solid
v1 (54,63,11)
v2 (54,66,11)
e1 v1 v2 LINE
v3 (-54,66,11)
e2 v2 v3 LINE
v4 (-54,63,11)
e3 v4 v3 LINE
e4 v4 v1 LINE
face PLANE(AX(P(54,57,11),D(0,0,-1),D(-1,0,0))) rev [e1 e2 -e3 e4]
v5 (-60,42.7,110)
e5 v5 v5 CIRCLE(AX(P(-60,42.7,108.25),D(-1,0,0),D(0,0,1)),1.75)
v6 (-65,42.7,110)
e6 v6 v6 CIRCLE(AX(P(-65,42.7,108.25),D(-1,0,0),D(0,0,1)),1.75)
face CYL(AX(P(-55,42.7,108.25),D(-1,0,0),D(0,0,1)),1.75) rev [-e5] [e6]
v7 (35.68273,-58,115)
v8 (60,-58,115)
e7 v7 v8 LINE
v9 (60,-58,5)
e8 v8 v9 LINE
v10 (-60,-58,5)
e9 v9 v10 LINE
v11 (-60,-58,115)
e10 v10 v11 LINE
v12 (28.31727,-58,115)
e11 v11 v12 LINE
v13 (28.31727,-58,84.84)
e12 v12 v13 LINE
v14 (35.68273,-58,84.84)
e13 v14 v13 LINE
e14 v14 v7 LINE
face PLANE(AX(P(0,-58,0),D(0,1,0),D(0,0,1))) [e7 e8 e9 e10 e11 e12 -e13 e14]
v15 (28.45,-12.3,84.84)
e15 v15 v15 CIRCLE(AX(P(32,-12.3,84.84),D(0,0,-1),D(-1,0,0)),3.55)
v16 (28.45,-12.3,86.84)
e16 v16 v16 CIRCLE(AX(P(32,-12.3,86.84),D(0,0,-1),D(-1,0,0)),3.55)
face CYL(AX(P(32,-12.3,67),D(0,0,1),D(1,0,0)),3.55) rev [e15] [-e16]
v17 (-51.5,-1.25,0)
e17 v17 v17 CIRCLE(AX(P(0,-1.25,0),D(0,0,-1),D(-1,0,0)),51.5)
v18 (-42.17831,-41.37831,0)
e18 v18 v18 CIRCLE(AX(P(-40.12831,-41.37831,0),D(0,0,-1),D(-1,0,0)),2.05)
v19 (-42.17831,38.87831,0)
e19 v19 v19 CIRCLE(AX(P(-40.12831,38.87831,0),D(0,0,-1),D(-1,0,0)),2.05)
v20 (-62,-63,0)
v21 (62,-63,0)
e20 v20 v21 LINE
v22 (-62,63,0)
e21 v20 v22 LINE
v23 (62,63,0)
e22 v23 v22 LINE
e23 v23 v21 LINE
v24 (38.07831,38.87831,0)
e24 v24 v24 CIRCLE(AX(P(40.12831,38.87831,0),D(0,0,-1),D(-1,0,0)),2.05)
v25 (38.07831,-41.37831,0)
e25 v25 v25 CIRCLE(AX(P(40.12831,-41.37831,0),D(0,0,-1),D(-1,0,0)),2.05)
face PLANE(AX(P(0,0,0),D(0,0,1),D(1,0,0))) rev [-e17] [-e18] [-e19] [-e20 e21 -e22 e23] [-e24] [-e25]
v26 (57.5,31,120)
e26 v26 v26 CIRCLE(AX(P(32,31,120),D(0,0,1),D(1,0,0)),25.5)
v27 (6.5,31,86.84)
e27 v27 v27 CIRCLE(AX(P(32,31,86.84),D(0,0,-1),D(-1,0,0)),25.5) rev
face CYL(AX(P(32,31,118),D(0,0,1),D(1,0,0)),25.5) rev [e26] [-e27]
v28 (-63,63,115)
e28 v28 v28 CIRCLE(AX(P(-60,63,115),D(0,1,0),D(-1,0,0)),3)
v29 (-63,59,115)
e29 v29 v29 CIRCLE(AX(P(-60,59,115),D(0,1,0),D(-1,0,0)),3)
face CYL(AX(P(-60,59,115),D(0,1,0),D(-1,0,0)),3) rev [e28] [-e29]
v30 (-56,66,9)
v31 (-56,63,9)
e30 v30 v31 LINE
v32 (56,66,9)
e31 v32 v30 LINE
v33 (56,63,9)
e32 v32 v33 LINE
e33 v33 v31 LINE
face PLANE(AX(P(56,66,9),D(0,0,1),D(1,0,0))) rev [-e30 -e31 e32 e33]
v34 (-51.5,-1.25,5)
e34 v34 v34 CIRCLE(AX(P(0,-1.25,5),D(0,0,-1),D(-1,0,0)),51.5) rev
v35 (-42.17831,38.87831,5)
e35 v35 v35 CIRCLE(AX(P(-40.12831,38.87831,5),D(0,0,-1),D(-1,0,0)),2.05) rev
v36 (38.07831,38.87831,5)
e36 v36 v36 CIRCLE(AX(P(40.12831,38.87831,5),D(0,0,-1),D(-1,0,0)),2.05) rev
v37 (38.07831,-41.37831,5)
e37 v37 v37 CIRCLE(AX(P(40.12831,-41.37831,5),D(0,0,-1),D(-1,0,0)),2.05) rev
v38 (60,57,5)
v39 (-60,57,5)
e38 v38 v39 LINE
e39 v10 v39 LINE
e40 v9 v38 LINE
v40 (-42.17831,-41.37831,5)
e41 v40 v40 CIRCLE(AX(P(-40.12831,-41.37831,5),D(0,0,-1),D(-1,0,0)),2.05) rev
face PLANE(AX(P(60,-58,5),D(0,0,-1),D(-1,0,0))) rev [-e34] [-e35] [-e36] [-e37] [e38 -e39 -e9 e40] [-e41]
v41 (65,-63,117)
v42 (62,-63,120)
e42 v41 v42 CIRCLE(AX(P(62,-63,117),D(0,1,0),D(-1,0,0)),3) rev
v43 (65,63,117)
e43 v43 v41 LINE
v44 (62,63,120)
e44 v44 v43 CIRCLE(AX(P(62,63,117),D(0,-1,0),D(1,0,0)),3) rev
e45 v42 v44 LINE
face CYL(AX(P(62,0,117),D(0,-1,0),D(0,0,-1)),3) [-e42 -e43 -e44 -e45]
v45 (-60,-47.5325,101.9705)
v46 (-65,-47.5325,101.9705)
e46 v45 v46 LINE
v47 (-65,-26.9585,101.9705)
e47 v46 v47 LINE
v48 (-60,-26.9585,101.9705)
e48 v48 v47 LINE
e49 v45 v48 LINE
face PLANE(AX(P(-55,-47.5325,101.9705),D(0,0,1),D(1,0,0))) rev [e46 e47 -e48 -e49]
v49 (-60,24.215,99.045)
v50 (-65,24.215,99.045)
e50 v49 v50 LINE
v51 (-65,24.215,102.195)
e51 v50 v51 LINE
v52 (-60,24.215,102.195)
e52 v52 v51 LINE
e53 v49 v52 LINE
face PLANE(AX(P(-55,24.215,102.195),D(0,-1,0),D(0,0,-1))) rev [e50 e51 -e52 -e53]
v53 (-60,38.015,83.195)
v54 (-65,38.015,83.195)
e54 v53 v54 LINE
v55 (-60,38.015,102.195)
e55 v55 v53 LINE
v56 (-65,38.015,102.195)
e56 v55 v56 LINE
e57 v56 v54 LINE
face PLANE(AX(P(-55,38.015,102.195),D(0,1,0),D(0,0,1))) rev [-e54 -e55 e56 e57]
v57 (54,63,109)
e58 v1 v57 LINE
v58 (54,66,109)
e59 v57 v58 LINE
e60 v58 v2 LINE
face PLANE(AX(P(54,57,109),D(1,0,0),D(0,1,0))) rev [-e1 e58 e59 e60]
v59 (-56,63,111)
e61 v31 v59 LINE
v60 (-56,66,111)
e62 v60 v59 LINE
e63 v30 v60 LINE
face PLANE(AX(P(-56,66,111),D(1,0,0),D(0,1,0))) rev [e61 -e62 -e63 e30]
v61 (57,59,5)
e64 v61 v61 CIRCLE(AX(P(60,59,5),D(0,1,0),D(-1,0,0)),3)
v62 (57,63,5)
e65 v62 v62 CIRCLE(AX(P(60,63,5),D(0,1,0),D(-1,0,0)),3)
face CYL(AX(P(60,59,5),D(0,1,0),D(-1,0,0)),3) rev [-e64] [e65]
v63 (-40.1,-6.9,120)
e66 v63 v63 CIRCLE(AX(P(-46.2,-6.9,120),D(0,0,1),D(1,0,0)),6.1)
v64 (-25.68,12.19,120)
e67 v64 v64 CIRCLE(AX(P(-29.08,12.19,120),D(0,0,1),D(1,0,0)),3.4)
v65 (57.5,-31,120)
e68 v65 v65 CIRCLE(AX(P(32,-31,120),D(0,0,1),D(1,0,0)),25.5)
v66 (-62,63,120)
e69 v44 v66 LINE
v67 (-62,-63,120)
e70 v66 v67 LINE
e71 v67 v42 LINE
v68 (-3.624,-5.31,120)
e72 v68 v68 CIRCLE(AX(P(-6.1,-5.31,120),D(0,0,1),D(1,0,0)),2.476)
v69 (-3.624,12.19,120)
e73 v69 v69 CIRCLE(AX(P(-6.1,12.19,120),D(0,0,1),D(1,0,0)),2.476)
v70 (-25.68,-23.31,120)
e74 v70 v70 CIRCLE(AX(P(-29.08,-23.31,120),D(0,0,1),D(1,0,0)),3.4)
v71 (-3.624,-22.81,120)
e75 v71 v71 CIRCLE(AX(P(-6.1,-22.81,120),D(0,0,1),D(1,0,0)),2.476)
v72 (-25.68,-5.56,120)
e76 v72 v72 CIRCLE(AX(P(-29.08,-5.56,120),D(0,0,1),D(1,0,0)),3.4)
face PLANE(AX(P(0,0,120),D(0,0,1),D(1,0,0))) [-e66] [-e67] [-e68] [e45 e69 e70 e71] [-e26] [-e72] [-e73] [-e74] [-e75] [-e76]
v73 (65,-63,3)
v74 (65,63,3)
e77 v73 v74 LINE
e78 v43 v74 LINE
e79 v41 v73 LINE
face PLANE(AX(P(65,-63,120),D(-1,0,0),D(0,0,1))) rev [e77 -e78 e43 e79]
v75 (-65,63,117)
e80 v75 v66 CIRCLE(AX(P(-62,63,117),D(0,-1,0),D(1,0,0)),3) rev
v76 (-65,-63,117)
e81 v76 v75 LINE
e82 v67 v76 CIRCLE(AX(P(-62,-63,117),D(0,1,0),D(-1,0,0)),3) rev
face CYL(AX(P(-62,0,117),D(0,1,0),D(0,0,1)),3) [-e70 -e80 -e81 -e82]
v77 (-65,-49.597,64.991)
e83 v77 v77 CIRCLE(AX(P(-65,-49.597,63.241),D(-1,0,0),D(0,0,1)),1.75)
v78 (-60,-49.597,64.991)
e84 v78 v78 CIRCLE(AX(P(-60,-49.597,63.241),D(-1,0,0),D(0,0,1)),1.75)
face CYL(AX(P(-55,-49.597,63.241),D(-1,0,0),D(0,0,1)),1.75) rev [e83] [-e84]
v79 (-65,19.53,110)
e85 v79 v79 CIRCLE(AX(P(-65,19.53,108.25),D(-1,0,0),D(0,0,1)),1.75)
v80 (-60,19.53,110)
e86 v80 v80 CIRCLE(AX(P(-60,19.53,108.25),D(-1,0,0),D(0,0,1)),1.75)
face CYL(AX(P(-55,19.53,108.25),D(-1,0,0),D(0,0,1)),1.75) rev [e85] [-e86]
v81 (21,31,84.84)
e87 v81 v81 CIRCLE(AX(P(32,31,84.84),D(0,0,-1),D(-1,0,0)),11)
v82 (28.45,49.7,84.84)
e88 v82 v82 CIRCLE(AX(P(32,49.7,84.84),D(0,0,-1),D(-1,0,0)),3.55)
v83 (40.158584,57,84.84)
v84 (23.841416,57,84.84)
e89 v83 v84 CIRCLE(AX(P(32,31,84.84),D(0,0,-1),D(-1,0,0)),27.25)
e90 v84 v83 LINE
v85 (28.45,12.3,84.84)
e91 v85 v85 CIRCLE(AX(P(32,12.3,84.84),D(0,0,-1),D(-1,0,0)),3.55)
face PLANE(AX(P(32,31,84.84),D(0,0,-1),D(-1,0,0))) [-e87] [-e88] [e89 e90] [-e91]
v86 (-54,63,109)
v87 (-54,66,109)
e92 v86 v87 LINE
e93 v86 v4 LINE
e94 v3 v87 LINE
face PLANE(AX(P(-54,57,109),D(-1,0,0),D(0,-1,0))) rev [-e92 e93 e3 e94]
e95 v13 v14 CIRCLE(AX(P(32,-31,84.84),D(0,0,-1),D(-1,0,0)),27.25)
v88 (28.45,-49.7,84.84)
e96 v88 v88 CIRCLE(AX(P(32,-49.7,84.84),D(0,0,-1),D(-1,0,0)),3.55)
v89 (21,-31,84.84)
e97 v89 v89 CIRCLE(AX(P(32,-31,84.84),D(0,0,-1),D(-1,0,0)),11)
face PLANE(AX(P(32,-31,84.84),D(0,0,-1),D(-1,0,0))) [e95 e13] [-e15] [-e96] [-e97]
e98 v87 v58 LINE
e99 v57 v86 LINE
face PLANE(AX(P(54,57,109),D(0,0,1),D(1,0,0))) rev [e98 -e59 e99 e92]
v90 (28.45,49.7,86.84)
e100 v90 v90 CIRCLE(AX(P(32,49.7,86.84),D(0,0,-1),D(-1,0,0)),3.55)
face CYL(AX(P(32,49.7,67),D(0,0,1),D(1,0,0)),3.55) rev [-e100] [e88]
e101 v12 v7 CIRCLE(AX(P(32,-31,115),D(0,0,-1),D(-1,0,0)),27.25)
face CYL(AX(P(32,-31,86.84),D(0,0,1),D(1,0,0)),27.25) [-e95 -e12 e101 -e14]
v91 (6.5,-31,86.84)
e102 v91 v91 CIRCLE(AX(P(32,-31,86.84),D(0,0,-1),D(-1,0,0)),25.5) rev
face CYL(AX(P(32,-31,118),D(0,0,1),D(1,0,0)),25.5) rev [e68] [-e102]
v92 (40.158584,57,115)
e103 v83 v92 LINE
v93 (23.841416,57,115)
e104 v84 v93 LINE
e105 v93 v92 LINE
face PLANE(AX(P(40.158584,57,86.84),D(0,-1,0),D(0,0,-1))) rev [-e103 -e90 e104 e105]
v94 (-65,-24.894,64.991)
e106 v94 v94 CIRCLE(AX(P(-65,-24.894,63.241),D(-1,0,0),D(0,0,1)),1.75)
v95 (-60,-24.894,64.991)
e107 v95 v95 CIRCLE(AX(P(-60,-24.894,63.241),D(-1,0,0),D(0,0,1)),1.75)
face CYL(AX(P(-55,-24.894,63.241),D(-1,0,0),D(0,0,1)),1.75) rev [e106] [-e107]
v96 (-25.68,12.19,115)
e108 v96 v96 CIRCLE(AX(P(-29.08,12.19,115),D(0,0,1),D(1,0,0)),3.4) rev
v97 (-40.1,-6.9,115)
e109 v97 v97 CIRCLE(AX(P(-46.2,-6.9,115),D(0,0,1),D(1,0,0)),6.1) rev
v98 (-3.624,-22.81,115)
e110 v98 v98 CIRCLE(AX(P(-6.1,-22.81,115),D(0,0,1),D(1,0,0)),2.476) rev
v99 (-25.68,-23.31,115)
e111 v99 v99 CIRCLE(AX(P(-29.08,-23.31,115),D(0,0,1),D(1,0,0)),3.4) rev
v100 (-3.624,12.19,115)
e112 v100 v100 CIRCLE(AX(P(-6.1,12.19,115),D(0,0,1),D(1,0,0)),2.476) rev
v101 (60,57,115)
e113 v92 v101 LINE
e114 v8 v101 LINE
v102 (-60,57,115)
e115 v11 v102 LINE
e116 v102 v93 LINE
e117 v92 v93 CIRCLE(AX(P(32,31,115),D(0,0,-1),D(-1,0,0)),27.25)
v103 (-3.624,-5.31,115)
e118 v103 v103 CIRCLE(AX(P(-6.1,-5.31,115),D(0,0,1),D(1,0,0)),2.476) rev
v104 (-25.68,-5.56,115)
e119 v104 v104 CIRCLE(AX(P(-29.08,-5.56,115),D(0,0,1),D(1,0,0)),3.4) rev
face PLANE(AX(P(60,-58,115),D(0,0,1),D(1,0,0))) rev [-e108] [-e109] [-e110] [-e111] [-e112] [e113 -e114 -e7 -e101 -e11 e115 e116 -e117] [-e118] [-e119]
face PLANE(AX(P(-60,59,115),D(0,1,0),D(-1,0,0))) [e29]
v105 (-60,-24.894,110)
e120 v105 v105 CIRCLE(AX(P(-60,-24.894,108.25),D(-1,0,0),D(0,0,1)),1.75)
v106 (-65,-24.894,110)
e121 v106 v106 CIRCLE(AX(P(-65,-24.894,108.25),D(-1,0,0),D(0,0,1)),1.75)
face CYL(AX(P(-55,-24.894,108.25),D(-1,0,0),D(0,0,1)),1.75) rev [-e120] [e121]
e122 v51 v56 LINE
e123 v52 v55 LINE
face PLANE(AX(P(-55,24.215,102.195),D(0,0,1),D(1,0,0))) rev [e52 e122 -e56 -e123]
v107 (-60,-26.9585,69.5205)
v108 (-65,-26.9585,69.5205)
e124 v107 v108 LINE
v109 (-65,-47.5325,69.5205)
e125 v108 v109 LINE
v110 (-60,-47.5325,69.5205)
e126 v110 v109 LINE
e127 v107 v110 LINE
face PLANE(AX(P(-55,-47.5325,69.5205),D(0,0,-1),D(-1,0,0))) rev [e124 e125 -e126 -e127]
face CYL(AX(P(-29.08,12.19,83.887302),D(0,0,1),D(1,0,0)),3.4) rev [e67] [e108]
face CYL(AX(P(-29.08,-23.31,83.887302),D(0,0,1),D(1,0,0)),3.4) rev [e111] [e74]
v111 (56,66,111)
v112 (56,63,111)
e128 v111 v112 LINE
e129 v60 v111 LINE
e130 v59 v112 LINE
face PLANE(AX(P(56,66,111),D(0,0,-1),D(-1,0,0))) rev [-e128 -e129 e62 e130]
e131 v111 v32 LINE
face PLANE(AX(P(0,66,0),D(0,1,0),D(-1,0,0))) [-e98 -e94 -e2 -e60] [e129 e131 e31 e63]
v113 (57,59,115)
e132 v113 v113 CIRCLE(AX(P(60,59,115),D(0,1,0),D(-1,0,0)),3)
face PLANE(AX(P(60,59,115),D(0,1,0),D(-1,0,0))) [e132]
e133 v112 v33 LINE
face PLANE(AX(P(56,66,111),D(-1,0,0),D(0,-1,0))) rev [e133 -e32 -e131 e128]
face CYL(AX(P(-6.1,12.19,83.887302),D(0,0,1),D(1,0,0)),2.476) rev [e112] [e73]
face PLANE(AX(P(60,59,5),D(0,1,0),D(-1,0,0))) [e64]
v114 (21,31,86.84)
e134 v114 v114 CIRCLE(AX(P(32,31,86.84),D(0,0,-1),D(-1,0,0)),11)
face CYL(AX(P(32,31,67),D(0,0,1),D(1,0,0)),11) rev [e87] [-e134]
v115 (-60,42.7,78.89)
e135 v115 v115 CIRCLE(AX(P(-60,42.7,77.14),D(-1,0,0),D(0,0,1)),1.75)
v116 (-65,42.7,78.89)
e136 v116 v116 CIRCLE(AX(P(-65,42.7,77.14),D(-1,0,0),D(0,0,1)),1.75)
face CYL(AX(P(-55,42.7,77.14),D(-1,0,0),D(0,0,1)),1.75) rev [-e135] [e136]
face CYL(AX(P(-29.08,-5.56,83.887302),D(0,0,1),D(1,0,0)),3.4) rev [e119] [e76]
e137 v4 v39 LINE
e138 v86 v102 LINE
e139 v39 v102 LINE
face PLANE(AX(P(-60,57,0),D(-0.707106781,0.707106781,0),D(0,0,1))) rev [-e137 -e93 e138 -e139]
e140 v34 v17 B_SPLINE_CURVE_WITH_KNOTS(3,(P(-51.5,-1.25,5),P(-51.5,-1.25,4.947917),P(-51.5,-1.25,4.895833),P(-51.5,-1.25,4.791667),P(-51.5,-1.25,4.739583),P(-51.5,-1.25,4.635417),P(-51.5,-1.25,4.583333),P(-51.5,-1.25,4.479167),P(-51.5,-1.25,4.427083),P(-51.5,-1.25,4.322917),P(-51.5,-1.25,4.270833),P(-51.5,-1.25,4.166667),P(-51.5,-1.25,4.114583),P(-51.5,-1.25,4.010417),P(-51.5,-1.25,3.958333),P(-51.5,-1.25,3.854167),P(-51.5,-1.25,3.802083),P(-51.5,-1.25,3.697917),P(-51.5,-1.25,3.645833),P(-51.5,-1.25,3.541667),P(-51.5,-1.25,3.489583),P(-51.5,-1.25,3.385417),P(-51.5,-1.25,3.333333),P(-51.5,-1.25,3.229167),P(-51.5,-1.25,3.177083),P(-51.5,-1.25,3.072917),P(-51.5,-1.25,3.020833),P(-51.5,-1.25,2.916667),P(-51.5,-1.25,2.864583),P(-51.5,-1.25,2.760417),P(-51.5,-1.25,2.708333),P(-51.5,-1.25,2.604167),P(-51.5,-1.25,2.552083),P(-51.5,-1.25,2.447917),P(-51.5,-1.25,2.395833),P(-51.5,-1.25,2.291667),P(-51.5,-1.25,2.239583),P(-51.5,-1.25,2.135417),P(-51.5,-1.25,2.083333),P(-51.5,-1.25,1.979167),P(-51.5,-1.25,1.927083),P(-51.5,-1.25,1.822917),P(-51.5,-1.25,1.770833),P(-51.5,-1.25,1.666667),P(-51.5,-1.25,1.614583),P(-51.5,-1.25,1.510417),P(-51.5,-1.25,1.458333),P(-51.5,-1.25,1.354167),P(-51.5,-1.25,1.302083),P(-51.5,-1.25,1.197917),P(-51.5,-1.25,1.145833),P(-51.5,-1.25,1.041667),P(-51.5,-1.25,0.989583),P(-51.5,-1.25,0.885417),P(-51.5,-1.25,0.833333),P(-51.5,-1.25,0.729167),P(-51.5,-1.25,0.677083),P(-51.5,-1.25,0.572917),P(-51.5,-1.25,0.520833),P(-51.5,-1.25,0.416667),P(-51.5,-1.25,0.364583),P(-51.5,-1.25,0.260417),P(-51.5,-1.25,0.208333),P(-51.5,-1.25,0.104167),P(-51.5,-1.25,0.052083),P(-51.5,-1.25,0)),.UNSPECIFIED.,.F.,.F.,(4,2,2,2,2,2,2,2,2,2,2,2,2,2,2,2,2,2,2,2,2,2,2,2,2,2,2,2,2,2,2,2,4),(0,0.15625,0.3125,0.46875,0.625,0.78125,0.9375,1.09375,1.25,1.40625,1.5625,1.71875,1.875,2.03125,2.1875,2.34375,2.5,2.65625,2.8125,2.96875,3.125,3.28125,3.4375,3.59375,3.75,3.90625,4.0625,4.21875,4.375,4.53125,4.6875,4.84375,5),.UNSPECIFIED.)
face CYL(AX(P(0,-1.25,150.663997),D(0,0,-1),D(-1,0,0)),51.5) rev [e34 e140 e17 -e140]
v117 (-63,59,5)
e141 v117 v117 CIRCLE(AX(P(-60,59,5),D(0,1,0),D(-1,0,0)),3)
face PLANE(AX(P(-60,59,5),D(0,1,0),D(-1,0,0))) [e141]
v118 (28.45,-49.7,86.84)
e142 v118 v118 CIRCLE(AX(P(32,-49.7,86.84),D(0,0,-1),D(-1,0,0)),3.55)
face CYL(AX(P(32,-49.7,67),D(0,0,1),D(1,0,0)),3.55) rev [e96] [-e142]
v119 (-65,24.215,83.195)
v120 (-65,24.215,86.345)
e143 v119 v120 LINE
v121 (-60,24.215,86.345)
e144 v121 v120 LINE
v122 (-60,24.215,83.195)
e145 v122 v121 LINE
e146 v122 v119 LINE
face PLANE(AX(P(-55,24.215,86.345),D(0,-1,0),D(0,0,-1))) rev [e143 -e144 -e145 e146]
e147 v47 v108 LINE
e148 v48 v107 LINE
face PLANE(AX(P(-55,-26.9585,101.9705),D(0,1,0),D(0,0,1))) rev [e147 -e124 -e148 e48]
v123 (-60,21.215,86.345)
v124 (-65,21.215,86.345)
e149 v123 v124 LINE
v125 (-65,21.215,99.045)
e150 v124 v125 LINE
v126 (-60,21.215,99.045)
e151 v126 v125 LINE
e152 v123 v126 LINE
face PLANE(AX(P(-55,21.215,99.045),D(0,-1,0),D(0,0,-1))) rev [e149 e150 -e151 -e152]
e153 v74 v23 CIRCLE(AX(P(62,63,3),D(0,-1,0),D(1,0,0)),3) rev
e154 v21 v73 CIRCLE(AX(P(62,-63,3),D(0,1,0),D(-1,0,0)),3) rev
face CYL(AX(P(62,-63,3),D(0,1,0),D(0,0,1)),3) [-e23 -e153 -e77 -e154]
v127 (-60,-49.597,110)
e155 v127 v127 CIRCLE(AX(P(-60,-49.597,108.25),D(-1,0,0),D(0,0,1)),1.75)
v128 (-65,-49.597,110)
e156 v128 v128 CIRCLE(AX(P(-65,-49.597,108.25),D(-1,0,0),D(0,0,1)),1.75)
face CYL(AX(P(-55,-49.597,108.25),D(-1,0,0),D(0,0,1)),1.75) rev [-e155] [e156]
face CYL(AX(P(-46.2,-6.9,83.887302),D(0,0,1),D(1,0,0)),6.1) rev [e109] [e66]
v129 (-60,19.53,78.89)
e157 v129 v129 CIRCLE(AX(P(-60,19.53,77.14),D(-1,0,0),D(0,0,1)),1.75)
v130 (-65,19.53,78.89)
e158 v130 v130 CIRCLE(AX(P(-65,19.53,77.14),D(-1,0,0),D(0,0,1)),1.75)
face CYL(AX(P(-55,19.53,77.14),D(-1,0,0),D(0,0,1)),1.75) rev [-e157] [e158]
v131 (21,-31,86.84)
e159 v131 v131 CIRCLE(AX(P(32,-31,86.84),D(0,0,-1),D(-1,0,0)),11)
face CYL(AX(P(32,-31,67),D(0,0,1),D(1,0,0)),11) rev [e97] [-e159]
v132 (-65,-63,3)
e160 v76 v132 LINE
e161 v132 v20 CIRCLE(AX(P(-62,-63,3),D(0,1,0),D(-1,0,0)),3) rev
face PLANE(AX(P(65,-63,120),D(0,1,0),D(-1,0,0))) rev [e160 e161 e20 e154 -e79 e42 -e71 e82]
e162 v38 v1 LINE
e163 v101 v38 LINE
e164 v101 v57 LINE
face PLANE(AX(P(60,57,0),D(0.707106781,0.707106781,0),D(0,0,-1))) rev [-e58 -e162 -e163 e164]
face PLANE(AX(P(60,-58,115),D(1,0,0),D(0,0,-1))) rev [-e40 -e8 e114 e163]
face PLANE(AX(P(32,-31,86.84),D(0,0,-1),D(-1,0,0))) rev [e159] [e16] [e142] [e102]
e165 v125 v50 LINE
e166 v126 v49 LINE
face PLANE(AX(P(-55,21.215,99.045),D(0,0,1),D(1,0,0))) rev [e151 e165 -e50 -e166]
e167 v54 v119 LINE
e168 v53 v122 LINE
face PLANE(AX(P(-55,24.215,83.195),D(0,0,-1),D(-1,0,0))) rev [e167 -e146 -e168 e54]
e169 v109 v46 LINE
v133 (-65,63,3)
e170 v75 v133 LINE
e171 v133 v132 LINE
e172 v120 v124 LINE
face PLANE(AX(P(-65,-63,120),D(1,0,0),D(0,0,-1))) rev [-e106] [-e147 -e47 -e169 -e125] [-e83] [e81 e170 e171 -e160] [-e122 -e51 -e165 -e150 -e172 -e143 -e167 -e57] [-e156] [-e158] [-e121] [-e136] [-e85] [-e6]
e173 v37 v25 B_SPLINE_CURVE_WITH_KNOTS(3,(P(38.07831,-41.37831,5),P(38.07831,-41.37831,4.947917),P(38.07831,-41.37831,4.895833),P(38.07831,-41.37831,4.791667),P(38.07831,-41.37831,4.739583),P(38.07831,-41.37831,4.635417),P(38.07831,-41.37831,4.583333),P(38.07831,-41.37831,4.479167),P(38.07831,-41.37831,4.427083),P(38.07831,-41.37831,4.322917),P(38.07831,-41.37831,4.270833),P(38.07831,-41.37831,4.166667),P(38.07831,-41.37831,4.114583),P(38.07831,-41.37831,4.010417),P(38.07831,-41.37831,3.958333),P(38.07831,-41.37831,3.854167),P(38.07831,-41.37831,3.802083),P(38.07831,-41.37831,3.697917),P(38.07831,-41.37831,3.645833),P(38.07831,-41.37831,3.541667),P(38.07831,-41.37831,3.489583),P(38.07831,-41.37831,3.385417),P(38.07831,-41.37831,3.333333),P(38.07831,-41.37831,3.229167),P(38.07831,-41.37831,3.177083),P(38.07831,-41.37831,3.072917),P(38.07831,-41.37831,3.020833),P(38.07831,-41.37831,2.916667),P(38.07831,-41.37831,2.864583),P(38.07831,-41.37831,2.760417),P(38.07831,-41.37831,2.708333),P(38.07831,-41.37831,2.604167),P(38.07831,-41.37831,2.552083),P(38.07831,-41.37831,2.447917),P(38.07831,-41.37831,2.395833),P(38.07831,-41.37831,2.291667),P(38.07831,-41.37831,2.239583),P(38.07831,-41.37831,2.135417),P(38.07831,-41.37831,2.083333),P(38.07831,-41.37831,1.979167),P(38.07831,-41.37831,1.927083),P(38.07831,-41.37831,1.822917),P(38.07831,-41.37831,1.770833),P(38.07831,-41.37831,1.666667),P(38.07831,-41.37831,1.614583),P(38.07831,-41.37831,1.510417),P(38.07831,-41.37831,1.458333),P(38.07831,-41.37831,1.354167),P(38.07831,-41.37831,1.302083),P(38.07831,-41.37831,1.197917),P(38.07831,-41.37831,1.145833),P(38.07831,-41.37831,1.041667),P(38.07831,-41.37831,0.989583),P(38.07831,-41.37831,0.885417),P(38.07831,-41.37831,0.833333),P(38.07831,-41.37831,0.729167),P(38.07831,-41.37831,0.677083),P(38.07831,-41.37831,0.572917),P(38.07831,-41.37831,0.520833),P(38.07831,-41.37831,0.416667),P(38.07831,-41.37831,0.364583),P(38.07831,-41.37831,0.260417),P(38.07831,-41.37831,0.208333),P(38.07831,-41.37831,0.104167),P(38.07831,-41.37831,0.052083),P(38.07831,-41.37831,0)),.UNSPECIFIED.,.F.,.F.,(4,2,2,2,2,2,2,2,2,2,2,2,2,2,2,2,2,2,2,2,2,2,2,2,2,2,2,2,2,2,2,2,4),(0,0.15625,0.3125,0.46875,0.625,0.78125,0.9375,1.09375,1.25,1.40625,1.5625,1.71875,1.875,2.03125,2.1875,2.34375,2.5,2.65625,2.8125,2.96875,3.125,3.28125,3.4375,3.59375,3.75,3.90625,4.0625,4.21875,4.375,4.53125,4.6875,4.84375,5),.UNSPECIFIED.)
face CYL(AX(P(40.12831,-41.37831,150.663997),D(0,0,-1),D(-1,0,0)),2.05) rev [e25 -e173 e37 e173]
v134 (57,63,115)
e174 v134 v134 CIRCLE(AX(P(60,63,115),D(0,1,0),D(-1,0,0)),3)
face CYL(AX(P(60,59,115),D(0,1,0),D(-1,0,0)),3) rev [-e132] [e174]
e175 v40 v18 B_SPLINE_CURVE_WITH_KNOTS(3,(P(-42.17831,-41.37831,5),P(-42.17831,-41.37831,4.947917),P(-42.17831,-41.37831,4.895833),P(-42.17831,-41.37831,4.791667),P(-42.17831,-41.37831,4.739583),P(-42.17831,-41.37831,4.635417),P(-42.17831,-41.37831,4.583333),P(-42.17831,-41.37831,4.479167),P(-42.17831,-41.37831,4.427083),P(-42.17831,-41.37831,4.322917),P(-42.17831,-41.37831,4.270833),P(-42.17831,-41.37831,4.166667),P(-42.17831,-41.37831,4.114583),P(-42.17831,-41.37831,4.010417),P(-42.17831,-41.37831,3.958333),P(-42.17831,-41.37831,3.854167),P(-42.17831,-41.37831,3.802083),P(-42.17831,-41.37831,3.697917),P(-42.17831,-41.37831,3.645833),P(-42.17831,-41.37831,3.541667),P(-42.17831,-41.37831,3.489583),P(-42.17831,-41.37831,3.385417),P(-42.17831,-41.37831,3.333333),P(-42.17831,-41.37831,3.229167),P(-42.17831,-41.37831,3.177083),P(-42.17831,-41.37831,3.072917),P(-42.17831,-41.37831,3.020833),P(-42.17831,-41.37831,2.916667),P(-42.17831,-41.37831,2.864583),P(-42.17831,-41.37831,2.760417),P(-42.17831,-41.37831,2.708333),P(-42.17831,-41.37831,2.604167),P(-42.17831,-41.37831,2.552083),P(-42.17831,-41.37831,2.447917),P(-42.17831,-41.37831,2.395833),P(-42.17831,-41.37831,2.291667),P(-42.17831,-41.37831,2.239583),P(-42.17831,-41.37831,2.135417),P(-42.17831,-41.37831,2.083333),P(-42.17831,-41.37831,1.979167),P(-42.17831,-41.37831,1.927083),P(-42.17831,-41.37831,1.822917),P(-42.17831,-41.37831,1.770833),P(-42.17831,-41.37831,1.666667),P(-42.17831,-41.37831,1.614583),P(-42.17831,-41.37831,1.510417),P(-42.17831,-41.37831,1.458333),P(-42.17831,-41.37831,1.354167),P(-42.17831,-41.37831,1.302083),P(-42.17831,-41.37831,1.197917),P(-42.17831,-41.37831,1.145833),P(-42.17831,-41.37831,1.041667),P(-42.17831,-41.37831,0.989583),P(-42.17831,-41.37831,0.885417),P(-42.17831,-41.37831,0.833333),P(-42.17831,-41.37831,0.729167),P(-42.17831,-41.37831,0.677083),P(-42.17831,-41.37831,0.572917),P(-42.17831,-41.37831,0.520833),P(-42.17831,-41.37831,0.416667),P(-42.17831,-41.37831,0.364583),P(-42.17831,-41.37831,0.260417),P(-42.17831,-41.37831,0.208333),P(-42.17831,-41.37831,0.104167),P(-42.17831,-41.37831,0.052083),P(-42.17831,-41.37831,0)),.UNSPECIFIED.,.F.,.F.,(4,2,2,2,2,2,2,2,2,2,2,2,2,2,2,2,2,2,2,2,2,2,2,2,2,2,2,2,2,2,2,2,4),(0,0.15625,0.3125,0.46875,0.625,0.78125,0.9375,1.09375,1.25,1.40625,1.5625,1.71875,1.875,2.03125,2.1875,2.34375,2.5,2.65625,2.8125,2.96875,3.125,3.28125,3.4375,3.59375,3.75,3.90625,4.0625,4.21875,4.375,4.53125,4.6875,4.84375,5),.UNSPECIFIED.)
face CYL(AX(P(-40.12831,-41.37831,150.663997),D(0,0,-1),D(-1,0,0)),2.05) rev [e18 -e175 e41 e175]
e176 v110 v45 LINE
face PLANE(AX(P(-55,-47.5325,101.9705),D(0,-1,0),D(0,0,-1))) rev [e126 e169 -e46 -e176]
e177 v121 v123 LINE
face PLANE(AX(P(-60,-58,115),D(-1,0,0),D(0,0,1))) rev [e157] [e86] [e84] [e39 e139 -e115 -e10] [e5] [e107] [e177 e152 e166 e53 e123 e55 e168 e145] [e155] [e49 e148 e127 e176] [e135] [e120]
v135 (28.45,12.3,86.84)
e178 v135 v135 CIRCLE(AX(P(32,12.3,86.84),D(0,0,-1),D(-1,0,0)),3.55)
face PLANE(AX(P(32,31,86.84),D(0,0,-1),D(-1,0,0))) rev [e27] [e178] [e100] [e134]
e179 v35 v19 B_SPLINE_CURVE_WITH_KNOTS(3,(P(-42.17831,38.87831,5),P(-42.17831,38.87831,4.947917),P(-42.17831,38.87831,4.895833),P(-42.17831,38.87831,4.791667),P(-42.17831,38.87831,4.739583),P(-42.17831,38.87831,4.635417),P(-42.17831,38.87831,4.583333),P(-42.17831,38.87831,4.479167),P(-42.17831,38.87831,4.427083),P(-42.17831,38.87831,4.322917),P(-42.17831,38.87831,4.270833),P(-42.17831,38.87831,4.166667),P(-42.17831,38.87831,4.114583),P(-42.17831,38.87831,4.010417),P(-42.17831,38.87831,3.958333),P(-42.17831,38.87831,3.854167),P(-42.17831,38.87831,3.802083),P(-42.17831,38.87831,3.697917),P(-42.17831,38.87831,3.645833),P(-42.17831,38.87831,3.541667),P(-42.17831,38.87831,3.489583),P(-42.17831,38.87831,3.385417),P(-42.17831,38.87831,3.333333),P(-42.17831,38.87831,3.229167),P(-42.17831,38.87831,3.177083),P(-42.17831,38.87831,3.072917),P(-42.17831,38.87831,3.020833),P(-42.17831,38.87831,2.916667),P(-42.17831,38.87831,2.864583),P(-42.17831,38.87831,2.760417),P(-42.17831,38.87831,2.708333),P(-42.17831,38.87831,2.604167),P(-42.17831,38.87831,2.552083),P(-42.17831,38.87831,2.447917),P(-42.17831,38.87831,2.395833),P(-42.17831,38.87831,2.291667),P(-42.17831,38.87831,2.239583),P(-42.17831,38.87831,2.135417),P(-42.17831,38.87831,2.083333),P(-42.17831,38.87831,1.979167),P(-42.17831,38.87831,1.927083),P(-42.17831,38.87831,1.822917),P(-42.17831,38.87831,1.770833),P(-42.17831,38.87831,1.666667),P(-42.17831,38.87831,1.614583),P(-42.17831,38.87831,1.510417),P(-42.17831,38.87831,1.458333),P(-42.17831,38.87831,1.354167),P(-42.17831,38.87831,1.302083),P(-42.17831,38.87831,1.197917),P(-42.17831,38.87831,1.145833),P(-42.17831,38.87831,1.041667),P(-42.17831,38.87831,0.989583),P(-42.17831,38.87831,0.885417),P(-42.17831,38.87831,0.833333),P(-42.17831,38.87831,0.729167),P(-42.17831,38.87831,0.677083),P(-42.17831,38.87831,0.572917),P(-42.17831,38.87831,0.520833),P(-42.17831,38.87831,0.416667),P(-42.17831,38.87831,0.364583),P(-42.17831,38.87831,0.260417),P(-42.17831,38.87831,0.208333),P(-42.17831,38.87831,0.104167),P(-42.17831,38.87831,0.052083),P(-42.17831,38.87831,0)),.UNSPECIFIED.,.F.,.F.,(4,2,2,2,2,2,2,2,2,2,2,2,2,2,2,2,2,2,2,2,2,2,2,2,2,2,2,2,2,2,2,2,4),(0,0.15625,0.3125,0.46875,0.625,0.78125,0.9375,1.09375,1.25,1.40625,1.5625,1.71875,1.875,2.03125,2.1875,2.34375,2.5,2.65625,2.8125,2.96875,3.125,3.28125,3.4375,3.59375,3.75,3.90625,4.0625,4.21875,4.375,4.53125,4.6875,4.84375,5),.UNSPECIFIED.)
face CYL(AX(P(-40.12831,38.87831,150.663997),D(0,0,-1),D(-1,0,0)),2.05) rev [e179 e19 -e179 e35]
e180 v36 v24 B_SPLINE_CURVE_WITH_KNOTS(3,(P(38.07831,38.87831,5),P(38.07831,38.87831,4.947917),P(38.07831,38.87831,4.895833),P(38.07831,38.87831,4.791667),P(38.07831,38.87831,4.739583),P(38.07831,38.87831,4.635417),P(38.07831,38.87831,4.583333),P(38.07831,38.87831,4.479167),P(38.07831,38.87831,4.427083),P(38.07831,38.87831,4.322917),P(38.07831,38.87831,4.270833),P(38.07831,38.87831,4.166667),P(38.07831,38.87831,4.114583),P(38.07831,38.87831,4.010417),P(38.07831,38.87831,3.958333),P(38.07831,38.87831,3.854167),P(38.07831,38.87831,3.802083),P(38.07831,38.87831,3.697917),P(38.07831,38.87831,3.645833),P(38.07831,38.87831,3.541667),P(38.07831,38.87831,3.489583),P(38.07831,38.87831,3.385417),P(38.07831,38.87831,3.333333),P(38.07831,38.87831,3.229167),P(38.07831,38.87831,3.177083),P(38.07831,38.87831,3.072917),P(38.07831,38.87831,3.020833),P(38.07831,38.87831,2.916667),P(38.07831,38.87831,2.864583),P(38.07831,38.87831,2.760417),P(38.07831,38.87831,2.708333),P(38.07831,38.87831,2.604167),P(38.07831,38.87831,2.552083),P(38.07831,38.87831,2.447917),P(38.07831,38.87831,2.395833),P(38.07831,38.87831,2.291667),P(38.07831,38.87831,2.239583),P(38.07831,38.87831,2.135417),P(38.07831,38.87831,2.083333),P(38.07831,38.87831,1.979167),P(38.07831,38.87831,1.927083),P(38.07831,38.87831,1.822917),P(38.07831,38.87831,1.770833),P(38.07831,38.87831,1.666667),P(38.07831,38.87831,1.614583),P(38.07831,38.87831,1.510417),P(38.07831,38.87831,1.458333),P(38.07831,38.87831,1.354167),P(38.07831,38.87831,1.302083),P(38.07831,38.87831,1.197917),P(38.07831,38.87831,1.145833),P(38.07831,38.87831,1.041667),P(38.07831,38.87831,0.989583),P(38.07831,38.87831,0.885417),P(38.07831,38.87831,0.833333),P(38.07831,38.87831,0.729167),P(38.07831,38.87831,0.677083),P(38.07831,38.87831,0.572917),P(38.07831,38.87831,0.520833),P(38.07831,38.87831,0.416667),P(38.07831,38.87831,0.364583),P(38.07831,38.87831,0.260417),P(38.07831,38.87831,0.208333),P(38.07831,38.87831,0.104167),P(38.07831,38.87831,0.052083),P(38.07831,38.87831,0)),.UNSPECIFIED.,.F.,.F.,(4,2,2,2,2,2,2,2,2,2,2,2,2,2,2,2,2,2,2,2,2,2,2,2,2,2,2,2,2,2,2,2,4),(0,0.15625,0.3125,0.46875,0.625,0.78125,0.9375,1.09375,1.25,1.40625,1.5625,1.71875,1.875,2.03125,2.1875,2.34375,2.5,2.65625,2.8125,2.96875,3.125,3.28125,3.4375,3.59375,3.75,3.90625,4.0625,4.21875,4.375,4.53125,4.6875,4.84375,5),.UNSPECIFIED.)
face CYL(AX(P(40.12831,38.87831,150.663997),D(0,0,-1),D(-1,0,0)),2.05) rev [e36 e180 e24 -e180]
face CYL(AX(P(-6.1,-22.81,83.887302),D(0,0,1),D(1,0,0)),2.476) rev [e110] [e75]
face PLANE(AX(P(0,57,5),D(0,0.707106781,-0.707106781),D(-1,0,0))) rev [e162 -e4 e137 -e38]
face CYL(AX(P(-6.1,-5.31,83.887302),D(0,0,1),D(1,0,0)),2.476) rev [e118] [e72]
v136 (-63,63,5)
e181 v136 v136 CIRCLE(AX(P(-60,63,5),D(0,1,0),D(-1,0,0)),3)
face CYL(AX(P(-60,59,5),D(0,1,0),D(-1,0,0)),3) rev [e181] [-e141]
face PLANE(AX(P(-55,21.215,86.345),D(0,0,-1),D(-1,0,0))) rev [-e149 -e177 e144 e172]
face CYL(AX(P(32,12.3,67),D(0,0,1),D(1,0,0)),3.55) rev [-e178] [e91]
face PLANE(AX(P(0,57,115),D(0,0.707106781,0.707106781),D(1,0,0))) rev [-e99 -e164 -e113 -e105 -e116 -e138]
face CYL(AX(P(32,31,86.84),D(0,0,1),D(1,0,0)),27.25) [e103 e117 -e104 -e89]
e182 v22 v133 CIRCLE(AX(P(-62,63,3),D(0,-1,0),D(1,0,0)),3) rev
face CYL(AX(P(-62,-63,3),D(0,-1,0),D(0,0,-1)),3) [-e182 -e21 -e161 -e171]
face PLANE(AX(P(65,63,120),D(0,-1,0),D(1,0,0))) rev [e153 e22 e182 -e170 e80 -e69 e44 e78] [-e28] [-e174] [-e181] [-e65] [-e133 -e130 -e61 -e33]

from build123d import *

# Parameters (mm, degrees)
SKETCH1_W           = 130
SKETCH1_H           = 126
BOSS_EXTRUDE1_DEPTH = 120
SKETCH3_W           = 120
SKETCH3_H           = 110
CUT_EXTRUDE3_DEPTH  = 121
SKETCH2_R           = 11
SKETCH2_R_2         = 3.55
SKETCH2_R_3         = 6.1
SKETCH2_R_4         = 3.4
SKETCH2_R_5         = 2.476
CUT_EXTRUDE4_DEPTH  = 5
SKETCH6_R           = 51.5
SKETCH6_R_2         = 2.05
CUT_EXTRUDE5_DEPTH  = 5
SKETCH7_W           = 120
SKETCH7_H           = 110
SKETCH7_W_2         = 108
SKETCH7_H_2         = 98
BOSS_EXTRUDE2_DEPTH = 6
SKETCH8_W           = 112
SKETCH8_H           = 102
SKETCH8_W_2         = 108
SKETCH8_H_2         = 98
BOSS_EXTRUDE3_DEPTH = 3
SKETCH9_R           = 3
CUT_EXTRUDE6_DEPTH  = 4
CHAMFER2_SIZE       = 6
SKETCH10_R          = 1.75
SKETCH10_W          = 32.45
SKETCH10_H          = 20.574
CUT_EXTRUDE10_DEPTH = 10
FILLET4_R           = 3
SKETCH16_R          = 25.5
CUT_EXTRUDE9_DEPTH  = 2
SKETCH18_R          = 27.25
SKETCH18_R_2        = 25.25
BOSS_EXTRUDE4_DEPTH = 28.16
SKETCH19_R          = 27.25
BOSS_EXTRUDE5_DEPTH = 2
SKETCH20_R          = 3.55
SKETCH20_R_2        = 11
CUT_EXTRUDE11_DEPTH = 51
SKETCH21_R          = 25.5
CUT_EXTRUDE12_DEPTH = 31.16


with BuildPart() as part:
    # Sketch1 → Boss-Extrude1 (new body)
    with BuildSketch(Plane.XY):
        Rectangle(SKETCH1_W, SKETCH1_H)
    extrude(amount=BOSS_EXTRUDE1_DEPTH)

    # Sketch3 → Cut-Extrude3 (cut)
    with BuildSketch(Plane(origin=(0, 63, 0), x_dir=(1, 0, 0), z_dir=(0, 1, 0))):
        with Locations((0, -60)):
            Rectangle(SKETCH3_W, SKETCH3_H)
    extrude(amount=-CUT_EXTRUDE3_DEPTH, mode=Mode.SUBTRACT)

    # Sketch2 → Cut-Extrude4 (cut)
    with BuildSketch(Plane.XY.offset(120)):
        with Locations((32, 31)):
            Circle(SKETCH2_R)
        with Locations((32, 49.7)):
            Circle(SKETCH2_R_2)
        with Locations((-46.2, -6.9)):
            Circle(SKETCH2_R_3)
        with Locations((-29.08, -5.56)):
            Circle(SKETCH2_R_4)
        with Locations((-29.08, 12.19)):
            Circle(SKETCH2_R_4)
        with Locations((-29.08, -23.31)):
            Circle(SKETCH2_R_4)
        with Locations((-6.1, -22.81)):
            Circle(SKETCH2_R_5)
        with Locations((-6.1, -5.31)):
            Circle(SKETCH2_R_5)
        with Locations((-6.1, 12.19)):
            Circle(SKETCH2_R_5)
        with Locations((32, -49.7)):
            Circle(SKETCH2_R_2)
        with Locations((32, 12.3)):
            Circle(SKETCH2_R_2)
        with Locations((32, -31)):
            Circle(SKETCH2_R)
        with Locations((32, -12.3)):
            Circle(SKETCH2_R_2)
    extrude(amount=-CUT_EXTRUDE4_DEPTH, mode=Mode.SUBTRACT)

    # Sketch6 → Cut-Extrude5 (cut)
    with BuildSketch(Plane(origin=(0, 0, 0), x_dir=(-1, 0, 0), z_dir=(0, 0, -1))):
        with Locations((0, -1.25)):
            Circle(SKETCH6_R)
        with Locations((40.128309832, -41.378309832)):
            Circle(SKETCH6_R_2)
        with Locations((-40.128309832, -41.378309832)):
            Circle(SKETCH6_R_2)
        with Locations((40.128309832, 38.878309832)):
            Circle(SKETCH6_R_2)
        with Locations((-40.128309832, 38.878309832)):
            Circle(SKETCH6_R_2)
    extrude(amount=-CUT_EXTRUDE5_DEPTH, mode=Mode.SUBTRACT)

    # Sketch7 → Boss-Extrude2 (add)
    with BuildSketch(Plane(origin=(0, 63, 0), x_dir=(1, 0, 0), z_dir=(0, 1, 0))):
        with Locations((0, -60)):
            Rectangle(SKETCH7_W, SKETCH7_H)
        with Locations((0, -60)):
            Rectangle(SKETCH7_W_2, SKETCH7_H_2, mode=Mode.SUBTRACT)
    extrude(amount=-BOSS_EXTRUDE2_DEPTH)

    # Sketch8 → Boss-Extrude3 (add)
    with BuildSketch(Plane(origin=(0, 63, 0), x_dir=(1, 0, 0), z_dir=(0, 1, 0))):
        with Locations((0, -60)):
            Rectangle(SKETCH8_W, SKETCH8_H)
        with Locations((0, -60)):
            Rectangle(SKETCH8_W_2, SKETCH8_H_2, mode=Mode.SUBTRACT)
    extrude(amount=BOSS_EXTRUDE3_DEPTH)

    # Sketch9 → Cut-Extrude6 (cut)
    with BuildSketch(Plane(origin=(0, 63, 0), x_dir=(1, 0, 0), z_dir=(0, 1, 0))):
        with Locations(Location((-60, -5, 0), (0, 0, 180))):
            Circle(SKETCH9_R)
        with Locations(Location((-60, -115, 0), (0, 0, 180))):
            Circle(SKETCH9_R)
        with Locations(Location((60, -115, 0), (0, 0, 180))):
            Circle(SKETCH9_R)
        with Locations(Location((60, -5, 0), (0, 0, 180))):
            Circle(SKETCH9_R)
    extrude(amount=-CUT_EXTRUDE6_DEPTH, mode=Mode.SUBTRACT)

    # Chamfer2
    chamfer2_edges = [part.edges().sort_by_distance(p)[0] for p in [
        (0, 57, 11),
        (-54, 57, 60),
        (0, 57, 109),
        (54, 57, 60),
    ]]
    chamfer(chamfer2_edges, length=CHAMFER2_SIZE - 0.0001)  # a hair under: the kernel refuses the full size

    # Sketch10 → Cut-Extrude10 (cut)
    with BuildSketch(Plane.ZY.offset(65)):
        with Locations((63.241, -24.894)):
            Circle(SKETCH10_R)
        with Locations((108.25, -24.894)):
            Circle(SKETCH10_R)
        with Locations((108.25, -49.597)):
            Circle(SKETCH10_R)
        with Locations((63.241, -49.597)):
            Circle(SKETCH10_R)
        with Locations((77.14, 42.7)):
            Circle(SKETCH10_R)
        with Locations((108.25, 42.7)):
            Circle(SKETCH10_R)
        with Locations((108.25, 19.53)):
            Circle(SKETCH10_R)
        with Locations((77.14, 19.53)):
            Circle(SKETCH10_R)
        with Locations((85.7455, -37.2455)):
            Rectangle(SKETCH10_W, SKETCH10_H)
        Polygon((86.345, 24.215), (83.195, 24.215), (83.195, 38.015), (102.195, 38.015), (102.195, 24.215), (99.045, 24.215), (99.045, 21.215), (86.345, 21.215), align=None)
    extrude(amount=-CUT_EXTRUDE10_DEPTH, mode=Mode.SUBTRACT)

    # Fillet4
    fillet4_edges = [part.edges().sort_by_distance(p)[0] for p in [
        (65, 0, 120),
        (-65, 0, 120),
        (65, 0, 0),
        (-65, 0, 0),
    ]]
    fillet(fillet4_edges, radius=FILLET4_R)

    # Sketch16 → Cut-Extrude9 (cut)
    with BuildSketch(Plane.XY.offset(120)):
        with Locations((32, 31)):
            Circle(SKETCH16_R)
        with Locations((32, -31)):
            Circle(SKETCH16_R)
    extrude(amount=-CUT_EXTRUDE9_DEPTH, mode=Mode.SUBTRACT)

    # Sketch18 → Boss-Extrude4 (add)
    # profile 1 of 2: a face of its own
    with BuildSketch(Plane(origin=(0, 0, 115), x_dir=(-1, 0, 0), z_dir=(0, 0, -1))):
        with Locations((-32, -31)):
            Circle(SKETCH18_R)
        with Locations((-32, -31)):
            Circle(SKETCH18_R_2, mode=Mode.SUBTRACT)
    # profile 2 of 2: a face of its own
    with BuildSketch(Plane(origin=(0, 0, 115), x_dir=(-1, 0, 0), z_dir=(0, 0, -1))):
        with BuildLine():
            Line((-40.158584436, 57), (-23.841415564, 57))
            ThreePointArc((-23.841415564, 57), (-32, 3.75), (-40.158584436, 57))
        make_face()
        with Locations((-32, 31)):
            Circle(SKETCH18_R_2, mode=Mode.SUBTRACT)
    extrude(amount=BOSS_EXTRUDE4_DEPTH)

    # Sketch19 → Boss-Extrude5 (add)
    with BuildSketch(Plane(origin=(0, 0, 86.84), x_dir=(-1, 0, 0), z_dir=(0, 0, -1))):
        with Locations((-32, -31)):
            Circle(SKETCH19_R)
        with BuildLine():
            Line((-40.158584436, 57), (-23.841415564, 57))
            ThreePointArc((-23.841415564, 57), (-32, 3.75), (-40.158584436, 57))
        make_face()
    extrude(amount=BOSS_EXTRUDE5_DEPTH)

    # Sketch20 → Cut-Extrude11 (cut)
    with BuildSketch(Plane.XY.offset(118)):
        with Locations((32, 49.7)):
            Circle(SKETCH20_R)
        with Locations((32, 31)):
            Circle(SKETCH20_R_2)
        with Locations((32, 12.3)):
            Circle(SKETCH20_R)
        with Locations((32, -31)):
            Circle(SKETCH20_R_2)
        with Locations((32, -12.3)):
            Circle(SKETCH20_R)
        with Locations((32, -49.7)):
            Circle(SKETCH20_R)
    extrude(amount=-CUT_EXTRUDE11_DEPTH, mode=Mode.SUBTRACT)

    # Sketch21 → Cut-Extrude12 (cut)
    with BuildSketch(Plane.XY.offset(118)):
        with Locations((32, 31)):
            Circle(SKETCH21_R)
        with Locations((32, -31)):
            Circle(SKETCH21_R)
    extrude(amount=-CUT_EXTRUDE12_DEPTH, mode=Mode.SUBTRACT)


solid = part.part
